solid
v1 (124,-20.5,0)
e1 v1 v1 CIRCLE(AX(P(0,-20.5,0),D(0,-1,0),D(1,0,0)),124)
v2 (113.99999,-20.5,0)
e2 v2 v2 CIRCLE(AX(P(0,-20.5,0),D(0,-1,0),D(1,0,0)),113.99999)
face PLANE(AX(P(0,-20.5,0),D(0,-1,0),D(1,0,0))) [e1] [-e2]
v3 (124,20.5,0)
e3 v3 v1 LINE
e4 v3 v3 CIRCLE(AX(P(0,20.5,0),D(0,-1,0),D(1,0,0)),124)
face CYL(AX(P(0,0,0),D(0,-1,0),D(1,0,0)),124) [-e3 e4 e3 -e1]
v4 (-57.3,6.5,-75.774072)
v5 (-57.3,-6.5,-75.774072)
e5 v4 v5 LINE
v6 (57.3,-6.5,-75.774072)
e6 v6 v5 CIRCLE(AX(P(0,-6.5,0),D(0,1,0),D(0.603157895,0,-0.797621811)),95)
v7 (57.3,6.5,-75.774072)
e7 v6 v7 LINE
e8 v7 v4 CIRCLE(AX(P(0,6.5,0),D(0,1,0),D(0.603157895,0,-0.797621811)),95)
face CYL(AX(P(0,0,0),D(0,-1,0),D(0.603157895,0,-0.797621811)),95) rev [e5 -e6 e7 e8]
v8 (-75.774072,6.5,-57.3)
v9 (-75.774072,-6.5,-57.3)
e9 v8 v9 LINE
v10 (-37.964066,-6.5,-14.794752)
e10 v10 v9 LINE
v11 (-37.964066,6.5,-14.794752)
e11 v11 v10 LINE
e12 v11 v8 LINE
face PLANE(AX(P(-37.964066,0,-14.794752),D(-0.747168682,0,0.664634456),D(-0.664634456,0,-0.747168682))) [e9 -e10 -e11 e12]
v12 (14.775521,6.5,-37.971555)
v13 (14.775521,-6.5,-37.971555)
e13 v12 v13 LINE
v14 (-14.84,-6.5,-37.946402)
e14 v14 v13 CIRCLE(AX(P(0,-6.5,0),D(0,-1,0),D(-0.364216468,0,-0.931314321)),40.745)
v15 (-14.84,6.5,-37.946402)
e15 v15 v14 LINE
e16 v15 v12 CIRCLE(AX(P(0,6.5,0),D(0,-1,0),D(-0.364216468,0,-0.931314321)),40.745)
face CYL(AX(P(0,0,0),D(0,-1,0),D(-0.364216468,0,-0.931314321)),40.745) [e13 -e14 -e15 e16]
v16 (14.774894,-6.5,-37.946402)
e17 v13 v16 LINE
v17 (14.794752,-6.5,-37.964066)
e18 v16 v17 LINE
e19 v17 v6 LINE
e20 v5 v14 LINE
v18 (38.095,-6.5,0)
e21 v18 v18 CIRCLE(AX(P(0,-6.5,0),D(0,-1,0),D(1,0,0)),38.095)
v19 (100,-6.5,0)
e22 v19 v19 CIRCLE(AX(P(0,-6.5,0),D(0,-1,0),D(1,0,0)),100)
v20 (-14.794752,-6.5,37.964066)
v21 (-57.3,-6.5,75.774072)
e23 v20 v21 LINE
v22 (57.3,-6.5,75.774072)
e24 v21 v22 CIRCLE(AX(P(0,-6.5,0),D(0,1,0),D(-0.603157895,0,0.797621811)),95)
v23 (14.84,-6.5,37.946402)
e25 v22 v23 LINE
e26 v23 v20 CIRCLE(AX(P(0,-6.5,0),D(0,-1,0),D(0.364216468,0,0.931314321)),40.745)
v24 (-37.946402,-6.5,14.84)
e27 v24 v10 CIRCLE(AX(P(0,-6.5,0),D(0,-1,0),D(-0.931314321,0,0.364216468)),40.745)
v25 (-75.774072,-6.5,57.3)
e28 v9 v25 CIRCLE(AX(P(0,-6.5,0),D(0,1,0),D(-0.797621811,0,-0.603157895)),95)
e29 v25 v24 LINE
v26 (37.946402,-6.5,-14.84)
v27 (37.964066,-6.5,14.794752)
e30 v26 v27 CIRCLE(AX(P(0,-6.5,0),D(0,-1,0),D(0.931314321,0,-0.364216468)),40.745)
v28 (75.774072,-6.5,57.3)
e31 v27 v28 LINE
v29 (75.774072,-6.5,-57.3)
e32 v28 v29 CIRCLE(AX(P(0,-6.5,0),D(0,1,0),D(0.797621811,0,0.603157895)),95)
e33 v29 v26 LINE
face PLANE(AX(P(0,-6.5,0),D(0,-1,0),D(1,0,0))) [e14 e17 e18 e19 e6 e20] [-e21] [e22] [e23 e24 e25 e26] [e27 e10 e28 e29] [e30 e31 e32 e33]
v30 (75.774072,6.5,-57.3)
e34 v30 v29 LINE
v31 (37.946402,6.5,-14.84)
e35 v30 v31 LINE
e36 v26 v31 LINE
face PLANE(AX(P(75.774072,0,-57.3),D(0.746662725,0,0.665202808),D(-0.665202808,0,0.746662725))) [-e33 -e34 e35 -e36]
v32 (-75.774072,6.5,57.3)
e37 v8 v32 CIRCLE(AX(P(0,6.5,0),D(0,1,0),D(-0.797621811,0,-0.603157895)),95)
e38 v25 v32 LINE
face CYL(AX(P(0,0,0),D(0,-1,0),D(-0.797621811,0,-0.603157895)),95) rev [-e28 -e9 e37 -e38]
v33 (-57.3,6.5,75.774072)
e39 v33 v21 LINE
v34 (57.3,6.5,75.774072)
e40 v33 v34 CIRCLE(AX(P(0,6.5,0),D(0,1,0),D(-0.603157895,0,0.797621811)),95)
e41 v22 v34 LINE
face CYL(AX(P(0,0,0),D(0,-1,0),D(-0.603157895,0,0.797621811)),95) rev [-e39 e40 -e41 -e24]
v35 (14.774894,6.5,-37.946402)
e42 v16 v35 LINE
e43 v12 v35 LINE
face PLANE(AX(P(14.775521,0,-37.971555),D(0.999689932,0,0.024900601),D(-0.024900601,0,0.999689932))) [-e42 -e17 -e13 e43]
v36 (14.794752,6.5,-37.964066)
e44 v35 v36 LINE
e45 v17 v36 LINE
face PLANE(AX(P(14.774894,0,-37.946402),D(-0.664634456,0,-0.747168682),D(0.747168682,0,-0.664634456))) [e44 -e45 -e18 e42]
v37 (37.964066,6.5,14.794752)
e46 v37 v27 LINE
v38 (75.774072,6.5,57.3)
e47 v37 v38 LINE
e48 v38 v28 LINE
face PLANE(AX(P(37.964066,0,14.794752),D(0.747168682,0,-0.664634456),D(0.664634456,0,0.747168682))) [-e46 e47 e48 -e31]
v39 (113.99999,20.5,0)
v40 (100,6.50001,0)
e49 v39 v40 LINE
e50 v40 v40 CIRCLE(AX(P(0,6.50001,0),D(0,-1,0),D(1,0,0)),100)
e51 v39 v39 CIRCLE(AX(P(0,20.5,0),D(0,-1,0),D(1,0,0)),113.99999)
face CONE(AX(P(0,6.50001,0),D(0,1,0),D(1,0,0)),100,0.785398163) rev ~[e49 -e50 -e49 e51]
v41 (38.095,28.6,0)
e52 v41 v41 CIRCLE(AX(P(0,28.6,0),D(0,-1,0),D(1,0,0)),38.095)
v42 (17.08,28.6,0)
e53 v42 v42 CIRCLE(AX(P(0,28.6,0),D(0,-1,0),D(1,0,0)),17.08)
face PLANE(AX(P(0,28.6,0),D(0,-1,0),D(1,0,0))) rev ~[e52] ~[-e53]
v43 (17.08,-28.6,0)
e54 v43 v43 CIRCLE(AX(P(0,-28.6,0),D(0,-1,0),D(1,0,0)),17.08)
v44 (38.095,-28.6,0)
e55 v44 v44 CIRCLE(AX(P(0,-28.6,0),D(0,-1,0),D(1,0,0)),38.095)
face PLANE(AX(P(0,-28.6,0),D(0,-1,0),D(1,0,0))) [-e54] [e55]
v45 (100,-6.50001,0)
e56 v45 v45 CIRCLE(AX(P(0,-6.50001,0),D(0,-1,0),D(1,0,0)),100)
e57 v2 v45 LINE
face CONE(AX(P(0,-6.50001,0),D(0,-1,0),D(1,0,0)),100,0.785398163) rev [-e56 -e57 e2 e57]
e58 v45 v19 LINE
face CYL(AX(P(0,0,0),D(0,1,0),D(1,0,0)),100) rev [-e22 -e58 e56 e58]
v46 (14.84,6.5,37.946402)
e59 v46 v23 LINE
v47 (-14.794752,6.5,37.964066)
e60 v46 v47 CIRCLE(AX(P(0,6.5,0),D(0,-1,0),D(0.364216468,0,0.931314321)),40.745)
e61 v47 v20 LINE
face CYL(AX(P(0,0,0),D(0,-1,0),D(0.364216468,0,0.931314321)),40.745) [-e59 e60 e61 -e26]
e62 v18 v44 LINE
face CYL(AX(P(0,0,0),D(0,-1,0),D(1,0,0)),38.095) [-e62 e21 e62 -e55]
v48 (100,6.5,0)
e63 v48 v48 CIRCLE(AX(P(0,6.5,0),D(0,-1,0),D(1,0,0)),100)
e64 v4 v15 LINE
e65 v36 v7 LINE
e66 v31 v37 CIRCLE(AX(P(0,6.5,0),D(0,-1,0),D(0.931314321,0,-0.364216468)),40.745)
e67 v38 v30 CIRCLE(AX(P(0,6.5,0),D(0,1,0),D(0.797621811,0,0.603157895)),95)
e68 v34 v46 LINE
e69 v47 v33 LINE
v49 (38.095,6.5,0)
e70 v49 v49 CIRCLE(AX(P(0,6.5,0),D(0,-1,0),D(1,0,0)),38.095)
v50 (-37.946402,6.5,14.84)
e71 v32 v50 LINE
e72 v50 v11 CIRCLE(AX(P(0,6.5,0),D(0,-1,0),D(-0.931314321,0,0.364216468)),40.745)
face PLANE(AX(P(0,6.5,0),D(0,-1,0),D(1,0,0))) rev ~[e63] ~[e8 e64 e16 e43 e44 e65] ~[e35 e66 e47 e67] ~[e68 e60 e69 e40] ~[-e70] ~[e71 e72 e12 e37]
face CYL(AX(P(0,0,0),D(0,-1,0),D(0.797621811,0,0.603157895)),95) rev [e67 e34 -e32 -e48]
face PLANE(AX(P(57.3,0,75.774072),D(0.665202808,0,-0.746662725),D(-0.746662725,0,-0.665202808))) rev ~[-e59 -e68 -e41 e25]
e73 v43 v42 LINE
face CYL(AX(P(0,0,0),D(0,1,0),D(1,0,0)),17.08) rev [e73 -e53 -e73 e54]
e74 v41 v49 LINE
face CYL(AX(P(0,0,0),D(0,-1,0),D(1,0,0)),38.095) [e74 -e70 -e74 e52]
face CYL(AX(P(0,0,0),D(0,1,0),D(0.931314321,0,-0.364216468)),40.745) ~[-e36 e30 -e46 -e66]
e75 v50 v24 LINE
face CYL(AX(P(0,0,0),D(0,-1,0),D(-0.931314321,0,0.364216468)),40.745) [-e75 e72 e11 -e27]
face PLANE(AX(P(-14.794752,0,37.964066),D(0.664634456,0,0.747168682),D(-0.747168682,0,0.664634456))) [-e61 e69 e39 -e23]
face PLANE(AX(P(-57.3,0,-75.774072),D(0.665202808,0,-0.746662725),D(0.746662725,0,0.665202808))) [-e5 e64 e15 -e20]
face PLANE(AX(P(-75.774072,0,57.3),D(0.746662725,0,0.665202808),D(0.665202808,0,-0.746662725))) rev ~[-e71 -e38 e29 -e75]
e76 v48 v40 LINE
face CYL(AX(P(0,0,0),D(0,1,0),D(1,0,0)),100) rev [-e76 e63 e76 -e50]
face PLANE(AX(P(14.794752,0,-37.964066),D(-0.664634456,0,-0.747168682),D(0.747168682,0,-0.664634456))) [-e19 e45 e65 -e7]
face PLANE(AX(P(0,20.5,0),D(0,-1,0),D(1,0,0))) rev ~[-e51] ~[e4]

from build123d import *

# Parameters (mm, degrees)
F0_R     = 38.095
F0_R_2   = 17.08
F1_DEPTH = 28.6
F0_R_3   = 100
F2_DEPTH = 6.5
F0_R_4   = 114
F3_DEPTH = 20.5
F4_SIZE  = 13.99999
F0_R_5   = 124
F5_DEPTH = 20.5


# Not quite as in the source:
# - a fillet or chamfer is up to 0.001 mm smaller than in the source, because OpenCascade refuses the exact size


with BuildPart() as f1:
    # F0 (on Front) → F1 (new body, symmetric)
    with BuildSketch(Plane.XZ):
        Circle(F0_R)
        Circle(F0_R_2, mode=Mode.SUBTRACT)
    extrude(amount=F1_DEPTH, both=True)

    # F0 (on Front) → F2 (join, symmetric)
    with BuildSketch(Plane.XZ):
        Circle(F0_R_3)
        with BuildLine():
            Line((-57.3000000001, -75.7740720829), (-14.84, -37.9464020034))
            ThreePointArc((-14.84, -37.9464020034), (-0.0346057341, -40.7449853042), (14.775520982, -37.9715552053))
            Line((14.775520982, -37.9715552053), (14.7748944579, -37.9464020034))
            Line((14.7748944579, -37.9464020034), (14.7947522966, -37.9640662928))
            Line((14.7947522966, -37.9640662928), (57.2999999977, -75.7740720847))
            ThreePointArc((57.2999999977, -75.7740720847), (-1.5e-09, -95.0000000002), (-57.3000000001, -75.7740720829))
        make_face(mode=Mode.SUBTRACT)
        with BuildLine():
            Line((75.7740720829, -57.3), (37.9464020034, -14.84))
            ThreePointArc((37.9464020034, -14.84), (40.7449927617, -0.0242867339), (37.9640662928, 14.7947522966))
            Line((37.9640662928, 14.7947522966), (75.7740720847, 57.2999999977))
            ThreePointArc((75.7740720847, 57.2999999977), (95.0000000002, -1.5e-09), (75.7740720829, -57.3))
        make_face(mode=Mode.SUBTRACT)
        with BuildLine():
            ThreePointArc((-75.7740720847, -57.2999999977), (-95.0000000002, 1.5e-09), (-75.7740720829, 57.3000000001))
            Line((-75.7740720829, 57.3), (-37.9464020034, 14.84))
            ThreePointArc((-37.9464020034, 14.84), (-40.7449927617, 0.0242867339), (-37.9640662928, -14.7947522966))
            Line((-37.9640662928, -14.7947522966), (-75.7740720847, -57.2999999977))
        make_face(mode=Mode.SUBTRACT)
        Circle(F0_R, mode=Mode.SUBTRACT)
        with BuildLine():
            Line((57.3, 75.7740720829), (14.84, 37.9464020034))
            ThreePointArc((14.84, 37.9464020034), (0.0242867339, 40.7449927617), (-14.7947522966, 37.9640662928))
            Line((-14.7947522966, 37.9640662928), (-57.2999999977, 75.7740720847))
            ThreePointArc((-57.2999999977, 75.7740720847), (1.5e-09, 95.0000000002), (57.3, 75.7740720829))
        make_face(mode=Mode.SUBTRACT)
    extrude(amount=F2_DEPTH, both=True)

    # F0 (on Front) → F3 (join, symmetric)
    with BuildSketch(Plane.XZ):
        Circle(F0_R_4)
        Circle(F0_R_3, mode=Mode.SUBTRACT)
    extrude(amount=F3_DEPTH, both=True)

    # F4 (size 14 in the source; OpenCascade refuses exactly that, so slightly less here)
    f4_edges = [f1.edges().sort_by_distance(p)[0] for p in [
        (-100, -20.5, 0),
        (-100, 20.5, 0),
    ]]
    chamfer(f4_edges, length=F4_SIZE)

    # F0 (on Front) → F5 (join, symmetric)
    with BuildSketch(Plane.XZ):
        Circle(F0_R_5)
        Circle(F0_R_4, mode=Mode.SUBTRACT)
    extrude(amount=F5_DEPTH, both=True)


solid = f1.part
